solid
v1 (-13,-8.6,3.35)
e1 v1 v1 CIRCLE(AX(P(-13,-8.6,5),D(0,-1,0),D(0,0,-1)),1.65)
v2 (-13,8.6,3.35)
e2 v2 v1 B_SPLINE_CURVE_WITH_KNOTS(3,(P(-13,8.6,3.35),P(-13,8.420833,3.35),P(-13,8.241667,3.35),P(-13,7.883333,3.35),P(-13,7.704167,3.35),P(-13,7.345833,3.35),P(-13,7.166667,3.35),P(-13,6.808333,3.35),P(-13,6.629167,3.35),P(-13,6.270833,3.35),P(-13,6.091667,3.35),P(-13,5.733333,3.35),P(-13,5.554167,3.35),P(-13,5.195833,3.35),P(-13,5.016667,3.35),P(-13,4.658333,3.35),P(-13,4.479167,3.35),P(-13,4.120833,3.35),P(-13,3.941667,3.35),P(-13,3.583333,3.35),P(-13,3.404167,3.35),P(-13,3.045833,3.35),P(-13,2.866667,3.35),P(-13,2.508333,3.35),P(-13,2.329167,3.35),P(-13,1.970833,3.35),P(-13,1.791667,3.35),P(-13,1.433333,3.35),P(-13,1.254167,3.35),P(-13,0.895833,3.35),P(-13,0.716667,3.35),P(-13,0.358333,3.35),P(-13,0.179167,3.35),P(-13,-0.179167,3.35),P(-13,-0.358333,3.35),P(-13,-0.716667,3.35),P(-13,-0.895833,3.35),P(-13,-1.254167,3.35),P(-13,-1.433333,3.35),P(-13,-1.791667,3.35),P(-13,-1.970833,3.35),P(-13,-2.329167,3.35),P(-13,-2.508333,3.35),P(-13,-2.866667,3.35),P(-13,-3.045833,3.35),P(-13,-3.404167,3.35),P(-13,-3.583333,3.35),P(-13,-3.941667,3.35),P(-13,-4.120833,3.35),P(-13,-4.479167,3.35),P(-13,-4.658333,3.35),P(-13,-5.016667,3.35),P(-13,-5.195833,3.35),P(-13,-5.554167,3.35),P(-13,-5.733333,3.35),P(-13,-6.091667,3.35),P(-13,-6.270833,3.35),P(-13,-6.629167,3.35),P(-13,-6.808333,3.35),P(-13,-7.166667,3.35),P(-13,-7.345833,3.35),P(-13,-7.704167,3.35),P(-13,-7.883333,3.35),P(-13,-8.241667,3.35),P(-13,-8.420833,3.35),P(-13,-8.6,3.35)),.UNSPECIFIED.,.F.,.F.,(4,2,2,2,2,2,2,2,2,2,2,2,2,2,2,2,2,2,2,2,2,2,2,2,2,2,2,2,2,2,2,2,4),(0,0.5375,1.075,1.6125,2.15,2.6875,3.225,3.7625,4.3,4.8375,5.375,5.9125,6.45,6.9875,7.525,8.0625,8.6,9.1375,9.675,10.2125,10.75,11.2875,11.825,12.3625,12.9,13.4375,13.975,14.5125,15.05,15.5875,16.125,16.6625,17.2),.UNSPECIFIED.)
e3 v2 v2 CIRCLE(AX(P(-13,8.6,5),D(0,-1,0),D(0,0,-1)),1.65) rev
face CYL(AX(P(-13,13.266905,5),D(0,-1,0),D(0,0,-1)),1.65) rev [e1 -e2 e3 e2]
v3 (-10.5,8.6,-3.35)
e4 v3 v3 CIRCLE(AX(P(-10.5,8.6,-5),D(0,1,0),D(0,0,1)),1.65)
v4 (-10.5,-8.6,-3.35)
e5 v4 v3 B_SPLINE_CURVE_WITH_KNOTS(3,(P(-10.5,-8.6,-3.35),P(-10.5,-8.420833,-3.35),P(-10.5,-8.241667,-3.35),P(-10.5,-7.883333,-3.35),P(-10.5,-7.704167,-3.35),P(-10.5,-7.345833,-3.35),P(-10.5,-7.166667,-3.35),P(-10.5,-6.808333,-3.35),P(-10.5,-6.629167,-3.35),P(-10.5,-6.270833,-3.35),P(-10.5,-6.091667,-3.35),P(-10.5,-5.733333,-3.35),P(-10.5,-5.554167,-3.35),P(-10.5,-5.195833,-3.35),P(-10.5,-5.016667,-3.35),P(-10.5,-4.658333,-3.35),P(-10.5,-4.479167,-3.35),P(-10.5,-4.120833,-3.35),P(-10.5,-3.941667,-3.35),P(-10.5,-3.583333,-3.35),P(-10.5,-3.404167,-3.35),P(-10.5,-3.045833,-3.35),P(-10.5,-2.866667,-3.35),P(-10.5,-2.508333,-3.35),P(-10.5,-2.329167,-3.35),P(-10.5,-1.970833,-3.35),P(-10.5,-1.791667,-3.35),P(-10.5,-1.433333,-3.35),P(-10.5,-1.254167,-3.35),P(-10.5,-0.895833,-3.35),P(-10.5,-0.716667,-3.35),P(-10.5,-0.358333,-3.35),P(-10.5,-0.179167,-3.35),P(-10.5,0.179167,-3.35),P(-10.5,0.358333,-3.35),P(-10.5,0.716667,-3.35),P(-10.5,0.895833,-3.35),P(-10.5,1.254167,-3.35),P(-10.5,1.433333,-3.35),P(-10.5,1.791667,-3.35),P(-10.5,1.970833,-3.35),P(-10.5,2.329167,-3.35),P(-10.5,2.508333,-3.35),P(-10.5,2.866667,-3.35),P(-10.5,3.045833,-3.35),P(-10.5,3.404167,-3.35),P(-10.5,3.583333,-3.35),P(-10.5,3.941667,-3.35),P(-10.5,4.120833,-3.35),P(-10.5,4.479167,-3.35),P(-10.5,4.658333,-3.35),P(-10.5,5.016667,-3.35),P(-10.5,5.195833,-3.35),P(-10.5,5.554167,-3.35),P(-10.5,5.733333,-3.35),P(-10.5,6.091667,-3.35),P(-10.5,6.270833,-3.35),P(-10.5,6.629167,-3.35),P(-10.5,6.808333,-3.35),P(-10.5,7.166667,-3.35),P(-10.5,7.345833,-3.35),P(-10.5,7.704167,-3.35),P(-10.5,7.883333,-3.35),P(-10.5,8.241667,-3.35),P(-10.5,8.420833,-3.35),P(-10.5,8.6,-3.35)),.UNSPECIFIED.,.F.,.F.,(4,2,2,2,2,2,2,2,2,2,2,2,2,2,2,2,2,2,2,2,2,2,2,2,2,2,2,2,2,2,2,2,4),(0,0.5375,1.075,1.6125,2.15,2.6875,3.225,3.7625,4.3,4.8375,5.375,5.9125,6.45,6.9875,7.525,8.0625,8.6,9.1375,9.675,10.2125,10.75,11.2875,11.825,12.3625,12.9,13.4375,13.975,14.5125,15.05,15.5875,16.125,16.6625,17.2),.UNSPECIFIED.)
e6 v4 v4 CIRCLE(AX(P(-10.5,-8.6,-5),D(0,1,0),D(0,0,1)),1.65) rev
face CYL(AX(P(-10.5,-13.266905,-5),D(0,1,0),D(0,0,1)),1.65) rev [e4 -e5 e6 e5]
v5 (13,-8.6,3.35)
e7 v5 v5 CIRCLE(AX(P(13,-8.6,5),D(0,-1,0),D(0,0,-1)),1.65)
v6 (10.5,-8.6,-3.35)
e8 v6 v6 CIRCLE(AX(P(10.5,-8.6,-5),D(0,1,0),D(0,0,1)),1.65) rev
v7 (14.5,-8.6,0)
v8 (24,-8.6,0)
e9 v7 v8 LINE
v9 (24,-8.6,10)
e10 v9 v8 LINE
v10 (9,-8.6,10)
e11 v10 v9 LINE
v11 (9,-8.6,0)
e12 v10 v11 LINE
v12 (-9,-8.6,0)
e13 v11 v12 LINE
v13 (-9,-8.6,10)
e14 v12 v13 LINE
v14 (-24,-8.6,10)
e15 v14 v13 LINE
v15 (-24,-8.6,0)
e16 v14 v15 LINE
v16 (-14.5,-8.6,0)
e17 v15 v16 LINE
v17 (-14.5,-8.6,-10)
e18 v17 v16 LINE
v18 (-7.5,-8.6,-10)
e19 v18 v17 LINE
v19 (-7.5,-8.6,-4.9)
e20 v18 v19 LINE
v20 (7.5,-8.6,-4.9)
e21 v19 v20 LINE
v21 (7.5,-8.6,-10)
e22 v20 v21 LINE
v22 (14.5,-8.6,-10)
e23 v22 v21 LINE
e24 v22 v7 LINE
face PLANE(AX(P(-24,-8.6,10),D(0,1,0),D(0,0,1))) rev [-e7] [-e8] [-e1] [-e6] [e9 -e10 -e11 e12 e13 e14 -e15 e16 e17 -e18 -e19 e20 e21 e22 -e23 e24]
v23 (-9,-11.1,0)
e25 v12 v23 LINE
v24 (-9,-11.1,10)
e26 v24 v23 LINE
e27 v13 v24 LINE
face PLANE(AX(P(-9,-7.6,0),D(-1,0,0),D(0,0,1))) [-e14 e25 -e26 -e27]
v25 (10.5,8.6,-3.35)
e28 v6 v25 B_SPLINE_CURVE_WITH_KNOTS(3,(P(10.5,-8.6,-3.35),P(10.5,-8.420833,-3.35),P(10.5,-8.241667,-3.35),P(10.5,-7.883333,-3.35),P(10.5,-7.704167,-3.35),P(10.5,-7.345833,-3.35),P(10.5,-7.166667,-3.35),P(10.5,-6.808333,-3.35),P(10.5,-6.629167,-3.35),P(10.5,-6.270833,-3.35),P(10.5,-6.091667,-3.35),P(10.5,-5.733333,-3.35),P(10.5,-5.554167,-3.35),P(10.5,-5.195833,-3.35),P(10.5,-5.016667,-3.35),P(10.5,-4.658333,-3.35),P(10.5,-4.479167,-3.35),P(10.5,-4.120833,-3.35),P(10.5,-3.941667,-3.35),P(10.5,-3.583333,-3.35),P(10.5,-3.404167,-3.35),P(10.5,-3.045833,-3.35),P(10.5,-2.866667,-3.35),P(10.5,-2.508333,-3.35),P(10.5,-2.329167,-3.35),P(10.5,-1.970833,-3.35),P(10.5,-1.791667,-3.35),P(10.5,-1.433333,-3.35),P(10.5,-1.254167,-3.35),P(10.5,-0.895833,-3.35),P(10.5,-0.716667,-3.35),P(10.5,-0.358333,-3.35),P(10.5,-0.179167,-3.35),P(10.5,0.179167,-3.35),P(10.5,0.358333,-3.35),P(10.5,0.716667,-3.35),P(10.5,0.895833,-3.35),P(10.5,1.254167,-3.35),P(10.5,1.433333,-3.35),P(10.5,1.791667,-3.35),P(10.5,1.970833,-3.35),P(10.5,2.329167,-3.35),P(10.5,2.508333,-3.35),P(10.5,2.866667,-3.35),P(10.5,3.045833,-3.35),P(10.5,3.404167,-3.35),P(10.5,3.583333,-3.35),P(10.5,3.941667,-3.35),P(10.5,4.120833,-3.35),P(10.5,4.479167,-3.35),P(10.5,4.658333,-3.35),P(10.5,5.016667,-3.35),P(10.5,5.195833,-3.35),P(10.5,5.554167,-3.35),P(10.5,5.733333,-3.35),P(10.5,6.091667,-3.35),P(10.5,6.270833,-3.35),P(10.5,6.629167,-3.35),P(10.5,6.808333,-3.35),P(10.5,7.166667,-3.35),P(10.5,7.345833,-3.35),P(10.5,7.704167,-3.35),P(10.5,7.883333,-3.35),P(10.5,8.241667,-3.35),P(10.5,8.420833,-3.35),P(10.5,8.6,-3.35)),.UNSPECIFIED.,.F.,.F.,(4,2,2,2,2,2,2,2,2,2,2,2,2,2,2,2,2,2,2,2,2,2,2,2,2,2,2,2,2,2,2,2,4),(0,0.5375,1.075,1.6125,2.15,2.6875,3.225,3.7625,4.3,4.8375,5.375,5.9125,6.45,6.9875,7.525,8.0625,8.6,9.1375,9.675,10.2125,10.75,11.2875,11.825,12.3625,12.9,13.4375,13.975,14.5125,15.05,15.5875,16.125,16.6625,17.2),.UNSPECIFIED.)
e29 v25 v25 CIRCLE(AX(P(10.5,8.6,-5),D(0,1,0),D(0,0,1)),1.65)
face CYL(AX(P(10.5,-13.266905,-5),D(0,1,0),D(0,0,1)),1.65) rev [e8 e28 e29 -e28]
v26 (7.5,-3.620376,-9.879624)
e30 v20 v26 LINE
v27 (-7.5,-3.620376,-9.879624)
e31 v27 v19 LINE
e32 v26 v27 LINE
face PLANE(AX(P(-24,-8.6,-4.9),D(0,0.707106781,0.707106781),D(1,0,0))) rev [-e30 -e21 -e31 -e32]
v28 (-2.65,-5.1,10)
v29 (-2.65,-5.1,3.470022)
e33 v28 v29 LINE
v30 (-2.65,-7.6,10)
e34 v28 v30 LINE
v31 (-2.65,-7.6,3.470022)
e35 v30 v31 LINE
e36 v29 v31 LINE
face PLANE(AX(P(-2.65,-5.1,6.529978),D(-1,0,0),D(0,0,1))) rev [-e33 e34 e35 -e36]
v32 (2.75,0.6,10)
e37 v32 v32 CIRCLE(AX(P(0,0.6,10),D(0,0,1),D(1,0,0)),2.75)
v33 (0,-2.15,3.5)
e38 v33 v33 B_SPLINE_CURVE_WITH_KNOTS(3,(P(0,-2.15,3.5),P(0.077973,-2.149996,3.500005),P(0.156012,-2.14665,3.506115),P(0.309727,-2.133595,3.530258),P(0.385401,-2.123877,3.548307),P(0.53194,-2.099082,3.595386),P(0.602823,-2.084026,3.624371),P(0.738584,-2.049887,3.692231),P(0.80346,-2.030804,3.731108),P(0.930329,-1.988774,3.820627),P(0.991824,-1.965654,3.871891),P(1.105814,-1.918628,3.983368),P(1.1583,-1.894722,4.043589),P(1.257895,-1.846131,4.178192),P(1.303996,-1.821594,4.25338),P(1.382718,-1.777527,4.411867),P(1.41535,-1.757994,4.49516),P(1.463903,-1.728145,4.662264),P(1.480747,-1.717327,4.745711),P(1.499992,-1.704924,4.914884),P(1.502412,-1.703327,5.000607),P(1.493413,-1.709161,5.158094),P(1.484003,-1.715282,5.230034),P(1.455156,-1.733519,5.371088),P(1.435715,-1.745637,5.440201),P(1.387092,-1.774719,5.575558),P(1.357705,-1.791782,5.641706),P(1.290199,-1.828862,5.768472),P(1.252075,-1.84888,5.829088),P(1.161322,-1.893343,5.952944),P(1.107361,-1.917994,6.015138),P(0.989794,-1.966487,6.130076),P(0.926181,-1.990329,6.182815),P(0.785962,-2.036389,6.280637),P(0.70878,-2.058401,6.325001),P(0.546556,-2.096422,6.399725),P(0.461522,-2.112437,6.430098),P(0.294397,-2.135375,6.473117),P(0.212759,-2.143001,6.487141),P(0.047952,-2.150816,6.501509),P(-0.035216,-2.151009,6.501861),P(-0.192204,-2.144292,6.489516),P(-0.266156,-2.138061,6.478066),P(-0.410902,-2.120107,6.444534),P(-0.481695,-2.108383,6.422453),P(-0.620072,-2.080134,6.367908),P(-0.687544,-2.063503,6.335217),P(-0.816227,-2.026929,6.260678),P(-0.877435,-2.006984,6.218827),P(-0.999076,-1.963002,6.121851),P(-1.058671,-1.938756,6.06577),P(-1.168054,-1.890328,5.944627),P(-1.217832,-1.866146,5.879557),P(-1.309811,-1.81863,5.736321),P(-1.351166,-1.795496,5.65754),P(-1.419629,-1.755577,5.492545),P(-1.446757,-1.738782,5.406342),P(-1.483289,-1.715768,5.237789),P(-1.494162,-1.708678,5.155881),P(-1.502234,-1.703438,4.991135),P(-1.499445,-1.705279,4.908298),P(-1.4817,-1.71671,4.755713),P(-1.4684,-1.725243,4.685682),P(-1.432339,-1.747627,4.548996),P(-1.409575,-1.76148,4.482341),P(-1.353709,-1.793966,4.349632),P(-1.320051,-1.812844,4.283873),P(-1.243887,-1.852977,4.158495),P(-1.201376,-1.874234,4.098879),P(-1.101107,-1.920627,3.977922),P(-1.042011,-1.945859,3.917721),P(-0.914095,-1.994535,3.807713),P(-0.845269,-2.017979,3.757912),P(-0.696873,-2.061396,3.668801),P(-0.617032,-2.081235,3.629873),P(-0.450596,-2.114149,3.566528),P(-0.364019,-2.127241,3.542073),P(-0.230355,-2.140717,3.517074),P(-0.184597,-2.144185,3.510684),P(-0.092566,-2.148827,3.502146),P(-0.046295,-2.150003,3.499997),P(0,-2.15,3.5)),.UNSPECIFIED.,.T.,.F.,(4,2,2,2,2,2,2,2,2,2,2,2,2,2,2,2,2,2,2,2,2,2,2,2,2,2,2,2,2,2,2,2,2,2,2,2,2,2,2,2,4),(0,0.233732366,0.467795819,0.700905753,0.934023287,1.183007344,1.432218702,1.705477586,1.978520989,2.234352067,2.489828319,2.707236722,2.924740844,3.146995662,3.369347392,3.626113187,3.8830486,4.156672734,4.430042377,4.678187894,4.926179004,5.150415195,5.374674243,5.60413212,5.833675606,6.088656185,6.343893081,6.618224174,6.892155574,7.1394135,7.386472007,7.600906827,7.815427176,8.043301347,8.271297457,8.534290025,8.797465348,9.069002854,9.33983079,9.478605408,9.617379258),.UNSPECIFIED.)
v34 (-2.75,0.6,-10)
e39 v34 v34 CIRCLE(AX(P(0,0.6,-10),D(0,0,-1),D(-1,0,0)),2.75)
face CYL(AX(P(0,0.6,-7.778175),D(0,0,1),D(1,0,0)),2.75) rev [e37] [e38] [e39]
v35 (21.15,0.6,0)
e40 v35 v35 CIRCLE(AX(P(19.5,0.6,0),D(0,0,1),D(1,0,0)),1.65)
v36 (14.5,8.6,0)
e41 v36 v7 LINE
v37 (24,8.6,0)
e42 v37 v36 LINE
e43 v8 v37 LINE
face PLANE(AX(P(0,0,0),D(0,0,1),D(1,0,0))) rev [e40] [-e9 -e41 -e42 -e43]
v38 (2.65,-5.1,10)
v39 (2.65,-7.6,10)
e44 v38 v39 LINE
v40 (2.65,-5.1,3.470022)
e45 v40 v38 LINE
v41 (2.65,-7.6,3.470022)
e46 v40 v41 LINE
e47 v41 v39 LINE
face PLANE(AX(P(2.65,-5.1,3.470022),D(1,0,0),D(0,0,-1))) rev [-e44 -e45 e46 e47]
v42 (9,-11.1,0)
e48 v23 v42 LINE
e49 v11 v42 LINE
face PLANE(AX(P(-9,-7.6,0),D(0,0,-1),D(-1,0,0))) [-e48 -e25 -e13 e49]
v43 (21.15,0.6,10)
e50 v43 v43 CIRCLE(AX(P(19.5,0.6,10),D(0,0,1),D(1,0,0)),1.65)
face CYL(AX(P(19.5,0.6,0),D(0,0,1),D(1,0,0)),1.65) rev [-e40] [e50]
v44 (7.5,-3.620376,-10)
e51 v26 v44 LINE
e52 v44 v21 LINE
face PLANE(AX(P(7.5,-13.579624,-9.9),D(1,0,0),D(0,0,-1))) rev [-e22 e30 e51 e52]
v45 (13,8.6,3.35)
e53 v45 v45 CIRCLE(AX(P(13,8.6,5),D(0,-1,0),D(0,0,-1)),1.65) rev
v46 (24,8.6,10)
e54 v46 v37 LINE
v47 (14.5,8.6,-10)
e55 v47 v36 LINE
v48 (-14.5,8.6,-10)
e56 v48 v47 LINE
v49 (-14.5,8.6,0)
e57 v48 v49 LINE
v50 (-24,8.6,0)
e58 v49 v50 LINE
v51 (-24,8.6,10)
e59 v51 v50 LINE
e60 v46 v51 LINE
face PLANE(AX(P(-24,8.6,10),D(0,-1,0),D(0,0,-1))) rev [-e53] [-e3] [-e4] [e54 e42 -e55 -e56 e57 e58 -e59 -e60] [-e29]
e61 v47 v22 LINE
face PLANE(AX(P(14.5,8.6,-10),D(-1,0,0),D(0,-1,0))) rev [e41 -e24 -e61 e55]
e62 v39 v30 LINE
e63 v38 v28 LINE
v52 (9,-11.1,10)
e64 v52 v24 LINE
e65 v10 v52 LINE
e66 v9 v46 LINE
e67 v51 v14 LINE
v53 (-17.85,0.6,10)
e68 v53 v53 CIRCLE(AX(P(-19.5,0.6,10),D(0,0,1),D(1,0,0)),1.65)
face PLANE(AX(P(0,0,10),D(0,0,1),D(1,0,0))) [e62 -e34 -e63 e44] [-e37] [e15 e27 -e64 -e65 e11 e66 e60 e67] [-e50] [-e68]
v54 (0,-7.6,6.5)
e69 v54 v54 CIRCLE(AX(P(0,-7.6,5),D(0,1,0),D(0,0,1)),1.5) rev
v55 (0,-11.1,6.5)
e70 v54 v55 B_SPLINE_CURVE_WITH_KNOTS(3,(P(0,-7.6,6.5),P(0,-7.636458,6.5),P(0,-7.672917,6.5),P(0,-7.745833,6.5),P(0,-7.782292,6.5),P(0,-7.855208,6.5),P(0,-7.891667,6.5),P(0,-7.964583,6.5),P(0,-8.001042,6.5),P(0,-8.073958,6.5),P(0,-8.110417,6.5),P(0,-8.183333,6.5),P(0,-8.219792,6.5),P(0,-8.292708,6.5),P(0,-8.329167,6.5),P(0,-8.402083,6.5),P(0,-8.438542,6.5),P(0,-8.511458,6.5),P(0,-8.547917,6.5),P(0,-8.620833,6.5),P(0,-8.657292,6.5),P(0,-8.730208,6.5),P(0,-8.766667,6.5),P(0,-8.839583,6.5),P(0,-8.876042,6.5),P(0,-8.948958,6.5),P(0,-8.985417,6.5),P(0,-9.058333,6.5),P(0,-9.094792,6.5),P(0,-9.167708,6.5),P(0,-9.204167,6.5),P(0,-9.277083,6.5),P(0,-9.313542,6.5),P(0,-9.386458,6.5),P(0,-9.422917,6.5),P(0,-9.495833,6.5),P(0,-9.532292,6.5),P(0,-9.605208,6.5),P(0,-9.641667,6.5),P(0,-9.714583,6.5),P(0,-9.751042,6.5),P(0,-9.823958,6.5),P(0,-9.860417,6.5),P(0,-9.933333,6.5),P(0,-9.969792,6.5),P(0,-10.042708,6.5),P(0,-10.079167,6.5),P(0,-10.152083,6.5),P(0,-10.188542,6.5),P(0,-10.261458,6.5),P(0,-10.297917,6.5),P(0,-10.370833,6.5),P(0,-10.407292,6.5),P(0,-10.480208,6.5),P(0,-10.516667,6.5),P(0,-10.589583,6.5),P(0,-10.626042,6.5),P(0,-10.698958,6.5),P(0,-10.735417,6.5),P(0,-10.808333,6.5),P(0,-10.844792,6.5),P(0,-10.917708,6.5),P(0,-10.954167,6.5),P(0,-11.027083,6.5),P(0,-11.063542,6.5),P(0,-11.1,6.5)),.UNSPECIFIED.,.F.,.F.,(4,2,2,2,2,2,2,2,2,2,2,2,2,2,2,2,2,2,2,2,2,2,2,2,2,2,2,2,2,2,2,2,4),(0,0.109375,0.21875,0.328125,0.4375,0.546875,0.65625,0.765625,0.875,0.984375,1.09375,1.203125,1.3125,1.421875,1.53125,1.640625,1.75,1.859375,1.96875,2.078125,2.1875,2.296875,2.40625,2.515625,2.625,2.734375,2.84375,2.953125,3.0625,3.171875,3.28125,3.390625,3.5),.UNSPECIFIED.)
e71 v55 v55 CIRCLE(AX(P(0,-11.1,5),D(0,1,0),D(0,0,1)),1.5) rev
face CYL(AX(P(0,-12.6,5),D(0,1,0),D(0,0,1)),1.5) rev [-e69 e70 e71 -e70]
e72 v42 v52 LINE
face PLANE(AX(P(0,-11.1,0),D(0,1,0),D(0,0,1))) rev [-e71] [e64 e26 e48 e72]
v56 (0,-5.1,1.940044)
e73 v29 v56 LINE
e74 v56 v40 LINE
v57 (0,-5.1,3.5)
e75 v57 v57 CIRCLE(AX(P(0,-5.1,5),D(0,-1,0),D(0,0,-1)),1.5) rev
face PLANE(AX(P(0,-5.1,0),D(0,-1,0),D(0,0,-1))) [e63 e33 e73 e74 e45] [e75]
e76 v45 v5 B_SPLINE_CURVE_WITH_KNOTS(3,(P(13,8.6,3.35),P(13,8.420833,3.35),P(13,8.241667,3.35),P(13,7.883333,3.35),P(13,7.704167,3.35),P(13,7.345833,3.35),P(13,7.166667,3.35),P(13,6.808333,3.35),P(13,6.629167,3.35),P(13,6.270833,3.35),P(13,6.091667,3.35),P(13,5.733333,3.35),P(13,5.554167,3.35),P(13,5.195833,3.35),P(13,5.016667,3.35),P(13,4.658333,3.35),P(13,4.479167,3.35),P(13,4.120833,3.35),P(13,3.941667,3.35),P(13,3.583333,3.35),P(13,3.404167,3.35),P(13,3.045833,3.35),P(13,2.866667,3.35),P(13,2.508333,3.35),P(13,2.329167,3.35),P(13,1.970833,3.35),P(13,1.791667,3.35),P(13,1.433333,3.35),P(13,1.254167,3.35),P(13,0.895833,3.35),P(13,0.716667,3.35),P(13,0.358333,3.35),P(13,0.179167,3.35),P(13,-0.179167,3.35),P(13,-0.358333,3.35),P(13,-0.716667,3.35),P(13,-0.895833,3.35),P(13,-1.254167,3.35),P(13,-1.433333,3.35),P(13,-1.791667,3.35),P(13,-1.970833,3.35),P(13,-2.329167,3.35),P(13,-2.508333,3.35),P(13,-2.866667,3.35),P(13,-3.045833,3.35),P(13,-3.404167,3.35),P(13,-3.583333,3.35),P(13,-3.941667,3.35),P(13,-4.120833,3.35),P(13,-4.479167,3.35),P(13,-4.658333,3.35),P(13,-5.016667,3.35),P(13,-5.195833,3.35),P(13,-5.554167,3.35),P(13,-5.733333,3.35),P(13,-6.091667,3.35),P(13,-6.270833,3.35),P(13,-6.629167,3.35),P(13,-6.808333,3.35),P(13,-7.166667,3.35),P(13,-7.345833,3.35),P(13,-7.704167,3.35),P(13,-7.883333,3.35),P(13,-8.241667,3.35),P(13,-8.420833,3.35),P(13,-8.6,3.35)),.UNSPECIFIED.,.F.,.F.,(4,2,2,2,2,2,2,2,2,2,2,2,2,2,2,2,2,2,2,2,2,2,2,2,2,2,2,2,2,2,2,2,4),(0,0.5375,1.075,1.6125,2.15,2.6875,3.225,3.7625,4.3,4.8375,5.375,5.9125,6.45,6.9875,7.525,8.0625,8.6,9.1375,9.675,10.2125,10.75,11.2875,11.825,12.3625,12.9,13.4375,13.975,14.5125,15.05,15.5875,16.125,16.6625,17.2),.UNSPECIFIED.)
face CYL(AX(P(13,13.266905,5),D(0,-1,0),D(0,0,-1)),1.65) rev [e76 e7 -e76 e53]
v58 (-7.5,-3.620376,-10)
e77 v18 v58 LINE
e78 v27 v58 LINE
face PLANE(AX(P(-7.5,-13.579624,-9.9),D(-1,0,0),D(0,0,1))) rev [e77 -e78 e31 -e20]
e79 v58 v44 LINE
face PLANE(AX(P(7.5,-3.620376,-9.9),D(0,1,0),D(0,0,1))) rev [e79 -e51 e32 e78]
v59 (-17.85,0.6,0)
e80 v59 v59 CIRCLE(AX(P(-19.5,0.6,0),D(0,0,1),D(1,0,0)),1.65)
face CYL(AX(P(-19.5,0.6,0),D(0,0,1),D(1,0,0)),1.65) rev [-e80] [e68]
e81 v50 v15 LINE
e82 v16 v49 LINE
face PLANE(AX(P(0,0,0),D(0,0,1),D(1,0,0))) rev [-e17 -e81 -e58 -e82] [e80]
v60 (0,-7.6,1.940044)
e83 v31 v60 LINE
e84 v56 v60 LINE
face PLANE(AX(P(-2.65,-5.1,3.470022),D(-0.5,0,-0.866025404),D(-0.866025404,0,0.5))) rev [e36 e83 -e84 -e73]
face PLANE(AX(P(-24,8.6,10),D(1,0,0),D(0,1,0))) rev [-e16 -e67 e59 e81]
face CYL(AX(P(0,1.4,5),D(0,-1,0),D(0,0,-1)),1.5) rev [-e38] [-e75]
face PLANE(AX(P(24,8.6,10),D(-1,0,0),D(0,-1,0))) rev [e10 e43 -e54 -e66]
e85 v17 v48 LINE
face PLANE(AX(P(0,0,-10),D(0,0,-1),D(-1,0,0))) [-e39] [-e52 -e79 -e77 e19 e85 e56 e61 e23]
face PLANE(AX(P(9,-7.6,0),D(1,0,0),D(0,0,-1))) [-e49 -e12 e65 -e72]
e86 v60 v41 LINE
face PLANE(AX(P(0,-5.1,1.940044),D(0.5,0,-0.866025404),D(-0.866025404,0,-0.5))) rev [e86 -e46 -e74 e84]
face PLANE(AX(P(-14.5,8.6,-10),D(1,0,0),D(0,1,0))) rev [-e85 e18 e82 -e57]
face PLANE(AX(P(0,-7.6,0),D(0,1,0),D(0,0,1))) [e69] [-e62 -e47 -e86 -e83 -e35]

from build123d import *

# Parameters (mm, degrees)
SZKIC1_W                         = 48
SZKIC1_H                         = 17.2
DODANIE_WYCI_GNI_CIE1_DEPTH      = 10
SZKIC2_R                         = 1.65
WYTNIJ_WYCI_GNI_CIE1_DEPTH       = 10
SZKIC3_R                         = 2.75
WYTNIJ_WYCI_GNI_CIE2_DEPTH       = 10
SZKIC4_R                         = 1.65
WYTNIJ_WYCI_GNI_CIE3_DEPTH       = 17.2
SZKIC5_W                         = 29
SZKIC5_H                         = 17.2
SZKIC5_R                         = 2.75
DODANIE_WYCI_GNI_CIE2_DEPTH      = 10
SZKIC6_R                         = 1.65
WYTNIJ_WYCI_GNI_CIE4_DEPTH       = 17.2
SZKIC7_W                         = 15
SZKIC7_H                         = 9.959248908
WYTNIJ_WYCI_GNI_CIE5_DEPTH       = 0.1
SFAZOWANIE1_SIZE                 = 5
SZKIC9_R                         = 1.5
WYTNIJ_WYCI_GNI_CIE6_DEPTH       = 10
WYTNIJ_WYCI_GNI_CIE7_DEPTH       = 3.5
DODANIE_WYCI_GNI_CIE3_DEPTH      = 2.5
DODANIE_WYCI_GNI_CIE3_DEPTH_BACK = 1
SZKIC8_W                         = 18
SZKIC8_H                         = 10
WYTNIJ_WYCI_GNI_CIE8_START       = 7.5
SZKIC11_R                        = 1.5
WYTNIJ_WYCI_GNI_CIE8_DEPTH       = 7.5


with BuildPart() as part:
    # Szkic1 → Dodanie-wyciągnięcie1 (new body)
    with BuildSketch(Plane.XY):
        Rectangle(SZKIC1_W, SZKIC1_H)
    extrude(amount=DODANIE_WYCI_GNI_CIE1_DEPTH)

    # Szkic2 → Wytnij-wyciągnięcie1 (cut)
    with BuildSketch(Plane.XY.offset(10)):
        with Locations((-19.5, 0.6)):
            Circle(SZKIC2_R)
        with Locations((19.5, 0.6)):
            Circle(SZKIC2_R)
    extrude(amount=-WYTNIJ_WYCI_GNI_CIE1_DEPTH, mode=Mode.SUBTRACT)

    # Szkic3 → Wytnij-wyciągnięcie2 (cut)
    with BuildSketch(Plane.XY.offset(10)):
        with Locations((0, 0.6)):
            Circle(SZKIC3_R)
    extrude(amount=-WYTNIJ_WYCI_GNI_CIE2_DEPTH, mode=Mode.SUBTRACT)

    # Szkic4 → Wytnij-wyciągnięcie3 (cut)
    with BuildSketch(Plane.XZ.offset(8.6)):
        with Locations(Location((-13, 5, 0), (0, 0, 270))):
            Circle(SZKIC4_R)
        with Locations(Location((13, 5, 0), (0, 0, 270))):
            Circle(SZKIC4_R)
    extrude(amount=-WYTNIJ_WYCI_GNI_CIE3_DEPTH, mode=Mode.SUBTRACT)

    # Szkic5 → Dodanie-wyciągnięcie2 (add)
    with BuildSketch(Plane(origin=(0, 0, 0), x_dir=(-1, 0, 0), z_dir=(0, 0, -1))):
        Rectangle(SZKIC5_W, SZKIC5_H)
        with Locations(Location((0, 0.6, 0), (0, 0, 180))):
            Circle(SZKIC5_R, mode=Mode.SUBTRACT)
    extrude(amount=DODANIE_WYCI_GNI_CIE2_DEPTH)

    # Szkic6 → Wytnij-wyciągnięcie4 (cut)
    with BuildSketch(Plane(origin=(0, 8.6, 0), x_dir=(1, 0, 0), z_dir=(0, 1, 0))):
        with Locations(Location((-10.5, 5, 0), (0, 0, 270))):
            Circle(SZKIC6_R)
        with Locations(Location((10.5, 5, 0), (0, 0, 270))):
            Circle(SZKIC6_R)
    extrude(amount=-WYTNIJ_WYCI_GNI_CIE4_DEPTH, mode=Mode.SUBTRACT)

    # Szkic7 → Wytnij-wyciągnięcie5 (cut)
    with BuildSketch(Plane(origin=(0, 0, -10), x_dir=(-1, 0, 0), z_dir=(0, 0, -1))):
        with Locations((0, -8.6)):
            Rectangle(SZKIC7_W, SZKIC7_H)
    extrude(amount=-WYTNIJ_WYCI_GNI_CIE5_DEPTH, mode=Mode.SUBTRACT)

    # Sfazowanie1
    # the kernel refuses this chamfer: 5 mm, written as the material it takes off along each edge
    with BuildSketch(Plane(origin=(-7.5, -8.6, -9.9), x_dir=(0, -0.027495876610586317, 0.9996219169112968), z_dir=(1, 0, 0))) as sfazowanie1_piece_1_section:
        Polygon((SFAZOWANIE1_SIZE * 0.999621916911, -SFAZOWANIE1_SIZE * 0.0274958766106), (-SFAZOWANIE1_SIZE * 0.0274958766106, -SFAZOWANIE1_SIZE * 0.999621916911), (0, 0), align=None)
    sfazowanie1_piece_1 = extrude(amount=15, mode=Mode.PRIVATE)
    sfazowanie1_piece_1 = split(sfazowanie1_piece_1, bisect_by=Plane(origin=(0, -3.620375546, -8.233305768), z_dir=(0, -1, 0)), keep=Keep.TOP, mode=Mode.PRIVATE)
    add(sfazowanie1_piece_1, mode=Mode.SUBTRACT)

    # Szkic9 → Wytnij-wyciągnięcie6 (cut)
    with BuildSketch(Plane.XZ.offset(8.6)):
        with Locations(Location((0, 5, 0), (0, 0, 270))):
            Circle(SZKIC9_R)
    extrude(amount=-WYTNIJ_WYCI_GNI_CIE6_DEPTH, mode=Mode.SUBTRACT)

    # Szkic10 → Wytnij-wyciągnięcie7 (cut)
    with BuildSketch(Plane.XZ.offset(8.6)):
        Polygon((-2.65, 6.529978213), (-2.65, 10), (2.65, 10), (2.65, 6.529978213), (2.65, 3.470021787), (0, 1.940043573), (-2.65, 3.470021787), align=None)
    extrude(amount=-WYTNIJ_WYCI_GNI_CIE7_DEPTH, mode=Mode.SUBTRACT)

    # Szkic8 → Dodanie-wyciągnięcie3 (add, two sides: drawn at the far end of the back side and taken through both)
    with BuildSketch(Plane.XZ.offset(8.6).offset(-DODANIE_WYCI_GNI_CIE3_DEPTH_BACK)):
        with Locations((0, 5)):
            Rectangle(SZKIC8_W, SZKIC8_H)
    extrude(amount=DODANIE_WYCI_GNI_CIE3_DEPTH + DODANIE_WYCI_GNI_CIE3_DEPTH_BACK)

    # Szkic11 → Wytnij-wyciągnięcie8 (cut)
    with BuildSketch(Plane.XZ.offset(5.1).offset(WYTNIJ_WYCI_GNI_CIE8_START)):
        with Locations(Location((0, 5, 0), (0, 0, 270))):
            Circle(SZKIC11_R)
    extrude(amount=-WYTNIJ_WYCI_GNI_CIE8_DEPTH, mode=Mode.SUBTRACT)


solid = part.part
